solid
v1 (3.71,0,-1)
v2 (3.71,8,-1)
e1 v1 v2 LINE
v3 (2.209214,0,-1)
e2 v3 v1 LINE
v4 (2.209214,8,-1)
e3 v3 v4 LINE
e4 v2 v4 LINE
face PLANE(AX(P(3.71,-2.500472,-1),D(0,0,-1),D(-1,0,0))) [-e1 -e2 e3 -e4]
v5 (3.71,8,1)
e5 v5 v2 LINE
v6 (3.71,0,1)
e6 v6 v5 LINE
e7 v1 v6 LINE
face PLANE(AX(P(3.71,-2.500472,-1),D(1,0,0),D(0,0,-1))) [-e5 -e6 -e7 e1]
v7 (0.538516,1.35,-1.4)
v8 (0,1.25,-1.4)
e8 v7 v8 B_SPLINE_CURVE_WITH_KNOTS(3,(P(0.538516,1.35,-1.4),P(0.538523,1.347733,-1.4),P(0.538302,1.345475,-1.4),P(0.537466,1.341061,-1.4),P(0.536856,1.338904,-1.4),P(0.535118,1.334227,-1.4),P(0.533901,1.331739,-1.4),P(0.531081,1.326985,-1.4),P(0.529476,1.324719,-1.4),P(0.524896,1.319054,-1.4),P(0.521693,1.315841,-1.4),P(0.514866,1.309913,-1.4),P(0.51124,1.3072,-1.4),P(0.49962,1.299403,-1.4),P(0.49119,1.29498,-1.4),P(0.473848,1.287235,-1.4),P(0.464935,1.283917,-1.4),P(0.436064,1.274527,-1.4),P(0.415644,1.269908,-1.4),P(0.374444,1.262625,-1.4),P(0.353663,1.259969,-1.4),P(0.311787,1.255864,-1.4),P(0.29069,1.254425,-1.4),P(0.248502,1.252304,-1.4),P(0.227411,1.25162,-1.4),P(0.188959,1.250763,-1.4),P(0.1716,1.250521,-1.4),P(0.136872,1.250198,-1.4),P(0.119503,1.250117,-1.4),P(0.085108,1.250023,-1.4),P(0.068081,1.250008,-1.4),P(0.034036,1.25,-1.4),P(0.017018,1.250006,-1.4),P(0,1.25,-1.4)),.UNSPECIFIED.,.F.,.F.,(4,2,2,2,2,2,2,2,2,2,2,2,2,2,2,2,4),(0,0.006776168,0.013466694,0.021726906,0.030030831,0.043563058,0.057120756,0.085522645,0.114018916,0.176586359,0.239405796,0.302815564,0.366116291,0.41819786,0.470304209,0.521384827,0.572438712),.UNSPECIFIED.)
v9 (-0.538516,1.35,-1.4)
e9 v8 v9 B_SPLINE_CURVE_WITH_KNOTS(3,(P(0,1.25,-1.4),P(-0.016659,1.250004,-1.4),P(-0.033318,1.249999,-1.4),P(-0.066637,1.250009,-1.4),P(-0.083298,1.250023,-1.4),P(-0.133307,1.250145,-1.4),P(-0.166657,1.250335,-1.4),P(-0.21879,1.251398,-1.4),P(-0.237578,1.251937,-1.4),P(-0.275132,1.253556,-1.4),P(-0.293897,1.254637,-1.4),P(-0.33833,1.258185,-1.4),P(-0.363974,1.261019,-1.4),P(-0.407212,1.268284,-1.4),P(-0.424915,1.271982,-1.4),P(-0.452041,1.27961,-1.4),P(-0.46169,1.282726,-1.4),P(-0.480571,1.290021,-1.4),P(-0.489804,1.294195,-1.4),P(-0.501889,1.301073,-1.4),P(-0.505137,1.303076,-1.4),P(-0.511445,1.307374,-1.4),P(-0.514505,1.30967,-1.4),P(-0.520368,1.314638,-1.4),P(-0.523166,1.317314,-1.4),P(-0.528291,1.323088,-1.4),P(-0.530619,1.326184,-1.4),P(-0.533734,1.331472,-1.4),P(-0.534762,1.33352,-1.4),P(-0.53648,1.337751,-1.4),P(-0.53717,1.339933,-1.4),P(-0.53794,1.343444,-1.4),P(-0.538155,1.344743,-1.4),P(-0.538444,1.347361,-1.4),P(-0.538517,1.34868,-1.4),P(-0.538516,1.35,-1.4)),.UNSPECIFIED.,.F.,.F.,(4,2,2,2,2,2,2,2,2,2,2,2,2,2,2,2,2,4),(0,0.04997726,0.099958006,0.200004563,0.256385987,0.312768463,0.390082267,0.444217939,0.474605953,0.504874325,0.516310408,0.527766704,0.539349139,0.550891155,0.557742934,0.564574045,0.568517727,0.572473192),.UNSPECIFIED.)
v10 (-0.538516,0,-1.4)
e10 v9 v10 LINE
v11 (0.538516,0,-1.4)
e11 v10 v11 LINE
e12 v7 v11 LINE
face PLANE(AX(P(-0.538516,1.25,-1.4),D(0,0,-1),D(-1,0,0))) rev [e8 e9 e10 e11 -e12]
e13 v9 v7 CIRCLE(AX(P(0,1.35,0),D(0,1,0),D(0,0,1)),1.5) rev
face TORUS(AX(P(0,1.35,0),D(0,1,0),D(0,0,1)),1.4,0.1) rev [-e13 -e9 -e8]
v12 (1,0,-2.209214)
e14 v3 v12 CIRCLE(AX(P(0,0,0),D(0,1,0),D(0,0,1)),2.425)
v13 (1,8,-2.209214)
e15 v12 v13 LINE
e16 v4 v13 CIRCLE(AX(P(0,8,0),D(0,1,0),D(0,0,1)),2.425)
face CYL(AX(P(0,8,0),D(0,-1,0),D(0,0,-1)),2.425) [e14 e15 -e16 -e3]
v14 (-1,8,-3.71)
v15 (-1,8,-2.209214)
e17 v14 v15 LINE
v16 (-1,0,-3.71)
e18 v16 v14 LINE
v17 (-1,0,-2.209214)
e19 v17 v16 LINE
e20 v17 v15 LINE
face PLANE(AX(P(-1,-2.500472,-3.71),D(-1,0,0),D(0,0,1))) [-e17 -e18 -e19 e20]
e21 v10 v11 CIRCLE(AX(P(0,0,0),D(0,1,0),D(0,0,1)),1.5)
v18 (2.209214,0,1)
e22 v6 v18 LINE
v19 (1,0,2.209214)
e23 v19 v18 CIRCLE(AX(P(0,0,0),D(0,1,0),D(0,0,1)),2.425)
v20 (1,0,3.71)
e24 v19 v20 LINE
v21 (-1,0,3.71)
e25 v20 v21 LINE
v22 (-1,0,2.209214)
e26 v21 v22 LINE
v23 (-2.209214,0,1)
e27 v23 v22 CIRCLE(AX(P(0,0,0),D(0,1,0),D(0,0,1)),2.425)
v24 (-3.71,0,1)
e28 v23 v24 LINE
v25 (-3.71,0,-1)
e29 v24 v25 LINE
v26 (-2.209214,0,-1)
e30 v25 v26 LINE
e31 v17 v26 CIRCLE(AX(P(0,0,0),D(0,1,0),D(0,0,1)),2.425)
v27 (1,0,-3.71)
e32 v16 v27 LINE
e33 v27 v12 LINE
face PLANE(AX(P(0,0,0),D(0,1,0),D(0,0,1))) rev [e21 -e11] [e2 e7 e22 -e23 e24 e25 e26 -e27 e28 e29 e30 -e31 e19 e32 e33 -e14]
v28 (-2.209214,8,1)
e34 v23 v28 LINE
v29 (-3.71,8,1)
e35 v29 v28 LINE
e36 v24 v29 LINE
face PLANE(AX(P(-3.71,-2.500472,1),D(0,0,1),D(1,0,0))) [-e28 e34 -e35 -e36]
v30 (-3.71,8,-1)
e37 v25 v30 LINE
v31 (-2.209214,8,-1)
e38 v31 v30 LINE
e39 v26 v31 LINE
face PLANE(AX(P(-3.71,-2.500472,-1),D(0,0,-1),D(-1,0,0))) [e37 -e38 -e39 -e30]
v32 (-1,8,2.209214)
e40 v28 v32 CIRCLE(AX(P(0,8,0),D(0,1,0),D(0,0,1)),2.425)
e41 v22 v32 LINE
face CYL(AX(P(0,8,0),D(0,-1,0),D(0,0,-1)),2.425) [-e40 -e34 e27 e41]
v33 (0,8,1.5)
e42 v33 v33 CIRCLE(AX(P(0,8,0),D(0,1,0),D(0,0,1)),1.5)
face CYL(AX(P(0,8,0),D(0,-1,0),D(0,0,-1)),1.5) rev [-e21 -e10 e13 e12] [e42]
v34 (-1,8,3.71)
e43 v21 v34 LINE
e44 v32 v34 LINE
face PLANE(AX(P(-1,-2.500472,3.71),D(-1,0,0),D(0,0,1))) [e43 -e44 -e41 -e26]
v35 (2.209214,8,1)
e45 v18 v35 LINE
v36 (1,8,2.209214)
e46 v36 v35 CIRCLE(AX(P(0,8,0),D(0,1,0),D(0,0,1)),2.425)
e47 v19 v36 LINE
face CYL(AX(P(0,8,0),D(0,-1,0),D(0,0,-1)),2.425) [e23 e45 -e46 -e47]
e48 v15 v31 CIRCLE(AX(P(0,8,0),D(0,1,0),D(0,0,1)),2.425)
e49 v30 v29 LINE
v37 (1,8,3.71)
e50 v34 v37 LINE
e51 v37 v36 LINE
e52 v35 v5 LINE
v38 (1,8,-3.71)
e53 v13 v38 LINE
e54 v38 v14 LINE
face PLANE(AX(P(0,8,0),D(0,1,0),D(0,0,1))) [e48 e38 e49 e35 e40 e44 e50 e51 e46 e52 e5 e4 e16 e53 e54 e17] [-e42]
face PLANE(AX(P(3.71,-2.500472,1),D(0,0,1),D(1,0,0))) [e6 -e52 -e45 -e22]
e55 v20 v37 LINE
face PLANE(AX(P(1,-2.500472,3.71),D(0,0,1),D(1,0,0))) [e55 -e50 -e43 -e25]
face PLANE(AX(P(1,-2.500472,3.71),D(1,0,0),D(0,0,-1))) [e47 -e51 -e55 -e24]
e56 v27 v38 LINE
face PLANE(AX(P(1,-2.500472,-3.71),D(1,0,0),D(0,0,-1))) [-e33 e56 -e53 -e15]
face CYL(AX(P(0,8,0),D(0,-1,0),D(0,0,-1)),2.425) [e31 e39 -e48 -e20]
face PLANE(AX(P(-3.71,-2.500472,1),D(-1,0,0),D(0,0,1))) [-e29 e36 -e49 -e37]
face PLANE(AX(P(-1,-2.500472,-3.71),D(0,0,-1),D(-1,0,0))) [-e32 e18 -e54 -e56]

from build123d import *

# Parameters (mm, degrees)
SKETCH1_R           = 2.425
SKETCH1_R_2         = 1.5
BOSS_EXTRUDE1_DEPTH = 8
BOSS_EXTRUDE2_START = -8
BOSS_EXTRUDE2_DEPTH = 8
CIRPATTERN1_COUNT   = 4
BOSS_EXTRUDE3_DEPTH = 1.25
FILLET1_R           = 0.1


with BuildPart() as part:
    # Sketch1 → Boss-Extrude1 (new body)
    with BuildSketch(Plane(origin=(0, 0, 0), x_dir=(1, 0, 0), z_dir=(0, 1, 0))):
        with Locations(Location((0, 0, 0), (0, 0, 270))):
            Circle(SKETCH1_R)
        with Locations(Location((0, 0, 0), (0, 0, 270))):
            Circle(SKETCH1_R_2, mode=Mode.SUBTRACT)
    extrude(amount=BOSS_EXTRUDE1_DEPTH)

    # Sketch2 → Boss-Extrude2 (add)
    with BuildSketch(Plane(origin=(0, 8, 0), x_dir=(1, 0, 0), z_dir=(0, 1, 0)).offset(BOSS_EXTRUDE2_START)):
        with BuildLine():
            Line((-3.71, -1), (-3.71, 1))
            Line((-3.71, 1), (-2.209213661, 1))
            ThreePointArc((-2.209213661, 1), (-2.425, 0), (-2.209213661, -1))
            Line((-2.209213661, -1), (-3.71, -1))
        make_face()
    boss_extrude2 = extrude(amount=BOSS_EXTRUDE2_DEPTH)

    # CirPattern1: Boss-Extrude2 ×4 about axis
    cirpattern1_axis = Axis((0, 0, 0), (0, 1, 0))
    for i in range(1, CIRPATTERN1_COUNT):
        add(boss_extrude2.rotate(cirpattern1_axis, i * 360 / CIRPATTERN1_COUNT))

    # Sketch3 → Boss-Extrude3 (add)
    with BuildSketch(Plane.XZ):
        with BuildLine():
            Line((-0.538516481, -1.4), (0.538516481, -1.4))
            ThreePointArc((0.538516481, -1.4), (0, -1.5), (-0.538516481, -1.4))
        make_face()
    extrude(amount=-BOSS_EXTRUDE3_DEPTH)

    # Fillet1
    fillet1_edges = [part.edges().sort_by_distance(p)[0] for p in [
        (0, 1.25, -1.5),
    ]]
    fillet(fillet1_edges, radius=FILLET1_R - 0.0001)  # a hair under: the kernel refuses the full size


solid = part.part
